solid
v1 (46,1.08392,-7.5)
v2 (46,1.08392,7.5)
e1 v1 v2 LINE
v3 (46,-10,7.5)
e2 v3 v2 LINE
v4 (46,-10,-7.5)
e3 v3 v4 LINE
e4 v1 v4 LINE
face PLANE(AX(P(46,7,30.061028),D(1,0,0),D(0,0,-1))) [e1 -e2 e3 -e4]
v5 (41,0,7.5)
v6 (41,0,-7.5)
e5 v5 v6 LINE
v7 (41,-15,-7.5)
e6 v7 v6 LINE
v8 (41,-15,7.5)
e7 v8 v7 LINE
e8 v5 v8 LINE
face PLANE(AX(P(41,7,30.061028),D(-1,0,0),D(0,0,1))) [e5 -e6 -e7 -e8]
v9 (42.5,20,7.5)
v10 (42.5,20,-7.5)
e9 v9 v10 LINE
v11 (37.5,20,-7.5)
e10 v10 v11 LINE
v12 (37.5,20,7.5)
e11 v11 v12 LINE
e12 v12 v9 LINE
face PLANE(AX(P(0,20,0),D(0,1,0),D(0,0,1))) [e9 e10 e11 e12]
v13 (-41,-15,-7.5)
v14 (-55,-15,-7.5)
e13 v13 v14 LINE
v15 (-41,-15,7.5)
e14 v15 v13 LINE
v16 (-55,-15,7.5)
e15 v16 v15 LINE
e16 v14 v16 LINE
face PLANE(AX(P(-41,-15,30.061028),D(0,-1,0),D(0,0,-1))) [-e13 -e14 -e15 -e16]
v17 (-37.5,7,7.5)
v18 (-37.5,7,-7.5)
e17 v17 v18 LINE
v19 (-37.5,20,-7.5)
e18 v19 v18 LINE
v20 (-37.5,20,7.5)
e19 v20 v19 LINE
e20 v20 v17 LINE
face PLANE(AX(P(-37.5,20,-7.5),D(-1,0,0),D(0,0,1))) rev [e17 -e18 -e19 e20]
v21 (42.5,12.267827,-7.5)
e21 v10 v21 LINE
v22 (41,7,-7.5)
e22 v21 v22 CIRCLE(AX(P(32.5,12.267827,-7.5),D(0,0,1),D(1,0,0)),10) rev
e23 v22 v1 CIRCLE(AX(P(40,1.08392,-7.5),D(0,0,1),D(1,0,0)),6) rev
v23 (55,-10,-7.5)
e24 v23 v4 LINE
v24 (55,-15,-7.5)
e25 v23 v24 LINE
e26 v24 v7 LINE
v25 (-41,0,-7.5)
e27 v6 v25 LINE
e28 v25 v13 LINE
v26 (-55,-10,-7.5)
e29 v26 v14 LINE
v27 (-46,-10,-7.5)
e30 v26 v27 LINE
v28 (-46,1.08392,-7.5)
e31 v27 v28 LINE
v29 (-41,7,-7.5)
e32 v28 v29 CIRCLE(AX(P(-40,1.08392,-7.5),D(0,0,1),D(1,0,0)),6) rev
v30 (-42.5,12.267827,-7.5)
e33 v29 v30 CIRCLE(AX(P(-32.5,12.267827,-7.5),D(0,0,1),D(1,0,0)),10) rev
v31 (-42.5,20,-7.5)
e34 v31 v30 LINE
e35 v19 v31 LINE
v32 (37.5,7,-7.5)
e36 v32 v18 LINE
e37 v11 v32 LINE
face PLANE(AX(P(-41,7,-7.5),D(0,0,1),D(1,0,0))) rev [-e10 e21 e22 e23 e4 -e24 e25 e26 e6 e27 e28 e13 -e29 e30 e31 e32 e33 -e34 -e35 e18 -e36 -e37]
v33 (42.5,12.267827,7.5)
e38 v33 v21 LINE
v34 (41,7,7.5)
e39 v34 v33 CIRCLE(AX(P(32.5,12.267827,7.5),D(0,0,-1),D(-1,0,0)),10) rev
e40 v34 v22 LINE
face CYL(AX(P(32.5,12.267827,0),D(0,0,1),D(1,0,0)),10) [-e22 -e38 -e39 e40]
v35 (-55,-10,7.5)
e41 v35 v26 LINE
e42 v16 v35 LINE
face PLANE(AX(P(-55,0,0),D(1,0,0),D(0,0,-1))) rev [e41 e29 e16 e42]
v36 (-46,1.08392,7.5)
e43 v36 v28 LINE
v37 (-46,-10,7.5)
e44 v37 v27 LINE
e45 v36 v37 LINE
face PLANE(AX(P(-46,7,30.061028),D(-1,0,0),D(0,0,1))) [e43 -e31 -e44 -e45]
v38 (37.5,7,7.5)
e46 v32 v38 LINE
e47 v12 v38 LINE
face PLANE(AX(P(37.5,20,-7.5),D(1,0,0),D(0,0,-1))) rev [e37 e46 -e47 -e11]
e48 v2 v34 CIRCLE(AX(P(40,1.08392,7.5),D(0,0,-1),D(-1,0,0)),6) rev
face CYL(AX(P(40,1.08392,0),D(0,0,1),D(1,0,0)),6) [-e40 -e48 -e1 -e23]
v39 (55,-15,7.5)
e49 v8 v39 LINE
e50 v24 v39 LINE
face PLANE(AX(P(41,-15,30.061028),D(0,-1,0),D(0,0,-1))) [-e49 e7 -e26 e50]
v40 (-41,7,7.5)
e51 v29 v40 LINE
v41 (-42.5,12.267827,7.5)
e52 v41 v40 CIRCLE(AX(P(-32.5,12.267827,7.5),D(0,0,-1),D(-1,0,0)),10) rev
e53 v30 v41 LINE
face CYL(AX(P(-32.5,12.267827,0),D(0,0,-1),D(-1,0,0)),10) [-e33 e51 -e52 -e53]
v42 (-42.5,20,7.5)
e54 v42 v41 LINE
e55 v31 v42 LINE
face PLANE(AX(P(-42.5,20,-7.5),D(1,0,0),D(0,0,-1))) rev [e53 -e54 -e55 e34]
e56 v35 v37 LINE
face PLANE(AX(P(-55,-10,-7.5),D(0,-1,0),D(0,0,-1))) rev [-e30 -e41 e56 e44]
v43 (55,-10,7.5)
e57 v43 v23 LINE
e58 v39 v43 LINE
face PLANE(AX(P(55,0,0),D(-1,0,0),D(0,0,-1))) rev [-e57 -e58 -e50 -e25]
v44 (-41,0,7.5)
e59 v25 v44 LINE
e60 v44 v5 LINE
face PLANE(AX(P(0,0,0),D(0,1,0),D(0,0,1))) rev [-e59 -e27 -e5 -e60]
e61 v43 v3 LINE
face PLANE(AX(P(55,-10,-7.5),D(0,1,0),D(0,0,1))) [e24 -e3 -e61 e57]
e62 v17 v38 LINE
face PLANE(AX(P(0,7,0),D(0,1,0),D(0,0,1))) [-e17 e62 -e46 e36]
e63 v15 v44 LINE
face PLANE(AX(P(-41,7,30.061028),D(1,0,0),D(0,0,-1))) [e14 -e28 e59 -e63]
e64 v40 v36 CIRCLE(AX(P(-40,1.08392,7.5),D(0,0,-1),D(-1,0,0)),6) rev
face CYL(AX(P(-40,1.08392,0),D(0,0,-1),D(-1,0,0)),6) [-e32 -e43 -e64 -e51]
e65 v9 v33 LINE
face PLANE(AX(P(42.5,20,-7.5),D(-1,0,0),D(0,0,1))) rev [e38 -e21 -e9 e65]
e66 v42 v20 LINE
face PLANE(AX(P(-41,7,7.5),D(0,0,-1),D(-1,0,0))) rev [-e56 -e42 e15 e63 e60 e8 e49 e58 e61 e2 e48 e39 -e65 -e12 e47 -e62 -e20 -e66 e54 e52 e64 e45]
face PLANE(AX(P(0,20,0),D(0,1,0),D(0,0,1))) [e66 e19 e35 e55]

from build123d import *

# Parameters (mm, degrees)
SKETCH1_W           = 82
SKETCH1_H           = 15
BOSS_EXTRUDE1_DEPTH = 7
SKETCH3_W           = 5
SKETCH3_H           = 15
BOSS_EXTRUDE2_DEPTH = 13
FILLET1_R           = 10
SKETCH4_W           = 5
SKETCH4_H           = 22
BOSS_EXTRUDE3_DEPTH = 15
FILLET2_R           = 6
SKETCH5_W           = 15
SKETCH5_H           = 5
BOSS_EXTRUDE4_DEPTH = 9


with BuildPart() as part:
    # Sketch1 → Boss-Extrude1 (new body)
    with BuildSketch(Plane(origin=(0, 0, 0), x_dir=(1, 0, 0), z_dir=(0, 1, 0))):
        Rectangle(SKETCH1_W, SKETCH1_H)
    extrude(amount=BOSS_EXTRUDE1_DEPTH)

    # Sketch3 → Boss-Extrude2 (add)
    with BuildSketch(Plane(origin=(0, 7, 0), x_dir=(1, 0, 0), z_dir=(0, 1, 0))):
        with Locations((-40, 0)):
            Rectangle(SKETCH3_W, SKETCH3_H)
        with Locations((40, 0)):
            Rectangle(SKETCH3_W, SKETCH3_H)
    extrude(amount=BOSS_EXTRUDE2_DEPTH)

    # Fillet1
    # the kernel refuses this fillet: 10 mm, written as the material it takes off along each edge
    with BuildSketch(Plane(origin=(42.5, 7, -20.669567191), x_dir=(-1, 0, 0), z_dir=(0, 0, 1)), Plane(origin=(-42.5, 7, 20.669567191), x_dir=(1, 0, 0), z_dir=(0, 0, -1))) as fillet1_piece_1:
        with BuildLine():
            CenterArc((10, -5.267826876), FILLET1_R, 148.211669383, 31.788330617)
            Line((0, -5.267826876), (-0.2, -5.267826876))
            Line((-0.2, -5.267826876), (-0.2, 0))
            Line((-0.2, 0), (0, 0.2))
            ThreePointArc((0, 0.2), (0.75, 0.2), (1.33, 0.105356538))
            Line((1.33, 0.105356538), (1.5, 0))
        make_face()
    extrude(amount=41.339134382, mode=Mode.SUBTRACT)

    # Sketch4 → Boss-Extrude3 (add)
    with BuildSketch(Plane(origin=(0, 0, -7.5), x_dir=(-1, 0, 0), z_dir=(0, 0, -1))):
        with Locations((-43.5, -4)):
            Rectangle(SKETCH4_W, SKETCH4_H)
        with Locations((43.5, -4)):
            Rectangle(SKETCH4_W, SKETCH4_H)
    extrude(amount=-BOSS_EXTRUDE3_DEPTH)

    # Fillet2
    # the kernel refuses this fillet: 6 mm, written as the material it takes off along each edge
    with BuildSketch(Plane(origin=(46, 7, -22.290199458), x_dir=(-1, 0, 0), z_dir=(0, 0, 1))) as fillet2_piece_1_section:
        with BuildLine():
            CenterArc((6, 5.916079783), FILLET2_R, 180, 80.405931773)
            Line((0, 5.916079783), (-0.12, 5.916079783))
            Line((-0.12, 5.916079783), (-0.12, 0))
            Line((-0.12, 0), (0, -0.12))
            ThreePointArc((0, -0.12), (2.5, -0.12), (4.98, -0.118321596))
            Line((4.98, -0.118321596), (5, 0))
        make_face()
    fillet2_piece_1 = extrude(amount=44.580398916, mode=Mode.PRIVATE)
    fillet2_piece_1 = fillet2_piece_1 - Plane(origin=(32.5, 12.267826876, 0), x_dir=(-1, 0, 0), z_dir=(0, 0, -1)) * Cylinder(10, 113, mode=Mode.PRIVATE)
    add(fillet2_piece_1, mode=Mode.SUBTRACT)
    with BuildSketch(Plane(origin=(-46, 7, -22.290199458), x_dir=(1, 0, 0), z_dir=(0, 0, 1))) as fillet2_piece_2_section:
        with BuildLine():
            CenterArc((6, -5.916079783), FILLET2_R, 99.594068227, 80.405931773)
            Line((0, -5.916079783), (-0.12, -5.916079783))
            Line((-0.12, -5.916079783), (-0.12, 0))
            Line((-0.12, 0), (0, 0.12))
            ThreePointArc((0, 0.12), (2.5, 0.12), (4.98, 0.118321596))
            Line((4.98, 0.118321596), (5, 0))
        make_face()
    fillet2_piece_2 = extrude(amount=44.580398916, mode=Mode.PRIVATE)
    fillet2_piece_2 = fillet2_piece_2 - Plane(origin=(-32.5, 12.267826876, 0), x_dir=(1, 0, 0), z_dir=(0, 0, 1)) * Cylinder(10, 113, mode=Mode.PRIVATE)
    add(fillet2_piece_2, mode=Mode.SUBTRACT)

    # Sketch5 → Boss-Extrude4 (add)
    with BuildSketch(Plane.ZY.offset(46)):
        with Locations((0, -12.5)):
            Rectangle(SKETCH5_W, SKETCH5_H)
    boss_extrude4 = extrude(amount=BOSS_EXTRUDE4_DEPTH)

    # Mirror1: Boss-Extrude4 across plane
    add(boss_extrude4.mirror(Plane(origin=(0, 0, 0), x_dir=(0, 0, 1), z_dir=(1, 0, 0))))


solid = part.part
